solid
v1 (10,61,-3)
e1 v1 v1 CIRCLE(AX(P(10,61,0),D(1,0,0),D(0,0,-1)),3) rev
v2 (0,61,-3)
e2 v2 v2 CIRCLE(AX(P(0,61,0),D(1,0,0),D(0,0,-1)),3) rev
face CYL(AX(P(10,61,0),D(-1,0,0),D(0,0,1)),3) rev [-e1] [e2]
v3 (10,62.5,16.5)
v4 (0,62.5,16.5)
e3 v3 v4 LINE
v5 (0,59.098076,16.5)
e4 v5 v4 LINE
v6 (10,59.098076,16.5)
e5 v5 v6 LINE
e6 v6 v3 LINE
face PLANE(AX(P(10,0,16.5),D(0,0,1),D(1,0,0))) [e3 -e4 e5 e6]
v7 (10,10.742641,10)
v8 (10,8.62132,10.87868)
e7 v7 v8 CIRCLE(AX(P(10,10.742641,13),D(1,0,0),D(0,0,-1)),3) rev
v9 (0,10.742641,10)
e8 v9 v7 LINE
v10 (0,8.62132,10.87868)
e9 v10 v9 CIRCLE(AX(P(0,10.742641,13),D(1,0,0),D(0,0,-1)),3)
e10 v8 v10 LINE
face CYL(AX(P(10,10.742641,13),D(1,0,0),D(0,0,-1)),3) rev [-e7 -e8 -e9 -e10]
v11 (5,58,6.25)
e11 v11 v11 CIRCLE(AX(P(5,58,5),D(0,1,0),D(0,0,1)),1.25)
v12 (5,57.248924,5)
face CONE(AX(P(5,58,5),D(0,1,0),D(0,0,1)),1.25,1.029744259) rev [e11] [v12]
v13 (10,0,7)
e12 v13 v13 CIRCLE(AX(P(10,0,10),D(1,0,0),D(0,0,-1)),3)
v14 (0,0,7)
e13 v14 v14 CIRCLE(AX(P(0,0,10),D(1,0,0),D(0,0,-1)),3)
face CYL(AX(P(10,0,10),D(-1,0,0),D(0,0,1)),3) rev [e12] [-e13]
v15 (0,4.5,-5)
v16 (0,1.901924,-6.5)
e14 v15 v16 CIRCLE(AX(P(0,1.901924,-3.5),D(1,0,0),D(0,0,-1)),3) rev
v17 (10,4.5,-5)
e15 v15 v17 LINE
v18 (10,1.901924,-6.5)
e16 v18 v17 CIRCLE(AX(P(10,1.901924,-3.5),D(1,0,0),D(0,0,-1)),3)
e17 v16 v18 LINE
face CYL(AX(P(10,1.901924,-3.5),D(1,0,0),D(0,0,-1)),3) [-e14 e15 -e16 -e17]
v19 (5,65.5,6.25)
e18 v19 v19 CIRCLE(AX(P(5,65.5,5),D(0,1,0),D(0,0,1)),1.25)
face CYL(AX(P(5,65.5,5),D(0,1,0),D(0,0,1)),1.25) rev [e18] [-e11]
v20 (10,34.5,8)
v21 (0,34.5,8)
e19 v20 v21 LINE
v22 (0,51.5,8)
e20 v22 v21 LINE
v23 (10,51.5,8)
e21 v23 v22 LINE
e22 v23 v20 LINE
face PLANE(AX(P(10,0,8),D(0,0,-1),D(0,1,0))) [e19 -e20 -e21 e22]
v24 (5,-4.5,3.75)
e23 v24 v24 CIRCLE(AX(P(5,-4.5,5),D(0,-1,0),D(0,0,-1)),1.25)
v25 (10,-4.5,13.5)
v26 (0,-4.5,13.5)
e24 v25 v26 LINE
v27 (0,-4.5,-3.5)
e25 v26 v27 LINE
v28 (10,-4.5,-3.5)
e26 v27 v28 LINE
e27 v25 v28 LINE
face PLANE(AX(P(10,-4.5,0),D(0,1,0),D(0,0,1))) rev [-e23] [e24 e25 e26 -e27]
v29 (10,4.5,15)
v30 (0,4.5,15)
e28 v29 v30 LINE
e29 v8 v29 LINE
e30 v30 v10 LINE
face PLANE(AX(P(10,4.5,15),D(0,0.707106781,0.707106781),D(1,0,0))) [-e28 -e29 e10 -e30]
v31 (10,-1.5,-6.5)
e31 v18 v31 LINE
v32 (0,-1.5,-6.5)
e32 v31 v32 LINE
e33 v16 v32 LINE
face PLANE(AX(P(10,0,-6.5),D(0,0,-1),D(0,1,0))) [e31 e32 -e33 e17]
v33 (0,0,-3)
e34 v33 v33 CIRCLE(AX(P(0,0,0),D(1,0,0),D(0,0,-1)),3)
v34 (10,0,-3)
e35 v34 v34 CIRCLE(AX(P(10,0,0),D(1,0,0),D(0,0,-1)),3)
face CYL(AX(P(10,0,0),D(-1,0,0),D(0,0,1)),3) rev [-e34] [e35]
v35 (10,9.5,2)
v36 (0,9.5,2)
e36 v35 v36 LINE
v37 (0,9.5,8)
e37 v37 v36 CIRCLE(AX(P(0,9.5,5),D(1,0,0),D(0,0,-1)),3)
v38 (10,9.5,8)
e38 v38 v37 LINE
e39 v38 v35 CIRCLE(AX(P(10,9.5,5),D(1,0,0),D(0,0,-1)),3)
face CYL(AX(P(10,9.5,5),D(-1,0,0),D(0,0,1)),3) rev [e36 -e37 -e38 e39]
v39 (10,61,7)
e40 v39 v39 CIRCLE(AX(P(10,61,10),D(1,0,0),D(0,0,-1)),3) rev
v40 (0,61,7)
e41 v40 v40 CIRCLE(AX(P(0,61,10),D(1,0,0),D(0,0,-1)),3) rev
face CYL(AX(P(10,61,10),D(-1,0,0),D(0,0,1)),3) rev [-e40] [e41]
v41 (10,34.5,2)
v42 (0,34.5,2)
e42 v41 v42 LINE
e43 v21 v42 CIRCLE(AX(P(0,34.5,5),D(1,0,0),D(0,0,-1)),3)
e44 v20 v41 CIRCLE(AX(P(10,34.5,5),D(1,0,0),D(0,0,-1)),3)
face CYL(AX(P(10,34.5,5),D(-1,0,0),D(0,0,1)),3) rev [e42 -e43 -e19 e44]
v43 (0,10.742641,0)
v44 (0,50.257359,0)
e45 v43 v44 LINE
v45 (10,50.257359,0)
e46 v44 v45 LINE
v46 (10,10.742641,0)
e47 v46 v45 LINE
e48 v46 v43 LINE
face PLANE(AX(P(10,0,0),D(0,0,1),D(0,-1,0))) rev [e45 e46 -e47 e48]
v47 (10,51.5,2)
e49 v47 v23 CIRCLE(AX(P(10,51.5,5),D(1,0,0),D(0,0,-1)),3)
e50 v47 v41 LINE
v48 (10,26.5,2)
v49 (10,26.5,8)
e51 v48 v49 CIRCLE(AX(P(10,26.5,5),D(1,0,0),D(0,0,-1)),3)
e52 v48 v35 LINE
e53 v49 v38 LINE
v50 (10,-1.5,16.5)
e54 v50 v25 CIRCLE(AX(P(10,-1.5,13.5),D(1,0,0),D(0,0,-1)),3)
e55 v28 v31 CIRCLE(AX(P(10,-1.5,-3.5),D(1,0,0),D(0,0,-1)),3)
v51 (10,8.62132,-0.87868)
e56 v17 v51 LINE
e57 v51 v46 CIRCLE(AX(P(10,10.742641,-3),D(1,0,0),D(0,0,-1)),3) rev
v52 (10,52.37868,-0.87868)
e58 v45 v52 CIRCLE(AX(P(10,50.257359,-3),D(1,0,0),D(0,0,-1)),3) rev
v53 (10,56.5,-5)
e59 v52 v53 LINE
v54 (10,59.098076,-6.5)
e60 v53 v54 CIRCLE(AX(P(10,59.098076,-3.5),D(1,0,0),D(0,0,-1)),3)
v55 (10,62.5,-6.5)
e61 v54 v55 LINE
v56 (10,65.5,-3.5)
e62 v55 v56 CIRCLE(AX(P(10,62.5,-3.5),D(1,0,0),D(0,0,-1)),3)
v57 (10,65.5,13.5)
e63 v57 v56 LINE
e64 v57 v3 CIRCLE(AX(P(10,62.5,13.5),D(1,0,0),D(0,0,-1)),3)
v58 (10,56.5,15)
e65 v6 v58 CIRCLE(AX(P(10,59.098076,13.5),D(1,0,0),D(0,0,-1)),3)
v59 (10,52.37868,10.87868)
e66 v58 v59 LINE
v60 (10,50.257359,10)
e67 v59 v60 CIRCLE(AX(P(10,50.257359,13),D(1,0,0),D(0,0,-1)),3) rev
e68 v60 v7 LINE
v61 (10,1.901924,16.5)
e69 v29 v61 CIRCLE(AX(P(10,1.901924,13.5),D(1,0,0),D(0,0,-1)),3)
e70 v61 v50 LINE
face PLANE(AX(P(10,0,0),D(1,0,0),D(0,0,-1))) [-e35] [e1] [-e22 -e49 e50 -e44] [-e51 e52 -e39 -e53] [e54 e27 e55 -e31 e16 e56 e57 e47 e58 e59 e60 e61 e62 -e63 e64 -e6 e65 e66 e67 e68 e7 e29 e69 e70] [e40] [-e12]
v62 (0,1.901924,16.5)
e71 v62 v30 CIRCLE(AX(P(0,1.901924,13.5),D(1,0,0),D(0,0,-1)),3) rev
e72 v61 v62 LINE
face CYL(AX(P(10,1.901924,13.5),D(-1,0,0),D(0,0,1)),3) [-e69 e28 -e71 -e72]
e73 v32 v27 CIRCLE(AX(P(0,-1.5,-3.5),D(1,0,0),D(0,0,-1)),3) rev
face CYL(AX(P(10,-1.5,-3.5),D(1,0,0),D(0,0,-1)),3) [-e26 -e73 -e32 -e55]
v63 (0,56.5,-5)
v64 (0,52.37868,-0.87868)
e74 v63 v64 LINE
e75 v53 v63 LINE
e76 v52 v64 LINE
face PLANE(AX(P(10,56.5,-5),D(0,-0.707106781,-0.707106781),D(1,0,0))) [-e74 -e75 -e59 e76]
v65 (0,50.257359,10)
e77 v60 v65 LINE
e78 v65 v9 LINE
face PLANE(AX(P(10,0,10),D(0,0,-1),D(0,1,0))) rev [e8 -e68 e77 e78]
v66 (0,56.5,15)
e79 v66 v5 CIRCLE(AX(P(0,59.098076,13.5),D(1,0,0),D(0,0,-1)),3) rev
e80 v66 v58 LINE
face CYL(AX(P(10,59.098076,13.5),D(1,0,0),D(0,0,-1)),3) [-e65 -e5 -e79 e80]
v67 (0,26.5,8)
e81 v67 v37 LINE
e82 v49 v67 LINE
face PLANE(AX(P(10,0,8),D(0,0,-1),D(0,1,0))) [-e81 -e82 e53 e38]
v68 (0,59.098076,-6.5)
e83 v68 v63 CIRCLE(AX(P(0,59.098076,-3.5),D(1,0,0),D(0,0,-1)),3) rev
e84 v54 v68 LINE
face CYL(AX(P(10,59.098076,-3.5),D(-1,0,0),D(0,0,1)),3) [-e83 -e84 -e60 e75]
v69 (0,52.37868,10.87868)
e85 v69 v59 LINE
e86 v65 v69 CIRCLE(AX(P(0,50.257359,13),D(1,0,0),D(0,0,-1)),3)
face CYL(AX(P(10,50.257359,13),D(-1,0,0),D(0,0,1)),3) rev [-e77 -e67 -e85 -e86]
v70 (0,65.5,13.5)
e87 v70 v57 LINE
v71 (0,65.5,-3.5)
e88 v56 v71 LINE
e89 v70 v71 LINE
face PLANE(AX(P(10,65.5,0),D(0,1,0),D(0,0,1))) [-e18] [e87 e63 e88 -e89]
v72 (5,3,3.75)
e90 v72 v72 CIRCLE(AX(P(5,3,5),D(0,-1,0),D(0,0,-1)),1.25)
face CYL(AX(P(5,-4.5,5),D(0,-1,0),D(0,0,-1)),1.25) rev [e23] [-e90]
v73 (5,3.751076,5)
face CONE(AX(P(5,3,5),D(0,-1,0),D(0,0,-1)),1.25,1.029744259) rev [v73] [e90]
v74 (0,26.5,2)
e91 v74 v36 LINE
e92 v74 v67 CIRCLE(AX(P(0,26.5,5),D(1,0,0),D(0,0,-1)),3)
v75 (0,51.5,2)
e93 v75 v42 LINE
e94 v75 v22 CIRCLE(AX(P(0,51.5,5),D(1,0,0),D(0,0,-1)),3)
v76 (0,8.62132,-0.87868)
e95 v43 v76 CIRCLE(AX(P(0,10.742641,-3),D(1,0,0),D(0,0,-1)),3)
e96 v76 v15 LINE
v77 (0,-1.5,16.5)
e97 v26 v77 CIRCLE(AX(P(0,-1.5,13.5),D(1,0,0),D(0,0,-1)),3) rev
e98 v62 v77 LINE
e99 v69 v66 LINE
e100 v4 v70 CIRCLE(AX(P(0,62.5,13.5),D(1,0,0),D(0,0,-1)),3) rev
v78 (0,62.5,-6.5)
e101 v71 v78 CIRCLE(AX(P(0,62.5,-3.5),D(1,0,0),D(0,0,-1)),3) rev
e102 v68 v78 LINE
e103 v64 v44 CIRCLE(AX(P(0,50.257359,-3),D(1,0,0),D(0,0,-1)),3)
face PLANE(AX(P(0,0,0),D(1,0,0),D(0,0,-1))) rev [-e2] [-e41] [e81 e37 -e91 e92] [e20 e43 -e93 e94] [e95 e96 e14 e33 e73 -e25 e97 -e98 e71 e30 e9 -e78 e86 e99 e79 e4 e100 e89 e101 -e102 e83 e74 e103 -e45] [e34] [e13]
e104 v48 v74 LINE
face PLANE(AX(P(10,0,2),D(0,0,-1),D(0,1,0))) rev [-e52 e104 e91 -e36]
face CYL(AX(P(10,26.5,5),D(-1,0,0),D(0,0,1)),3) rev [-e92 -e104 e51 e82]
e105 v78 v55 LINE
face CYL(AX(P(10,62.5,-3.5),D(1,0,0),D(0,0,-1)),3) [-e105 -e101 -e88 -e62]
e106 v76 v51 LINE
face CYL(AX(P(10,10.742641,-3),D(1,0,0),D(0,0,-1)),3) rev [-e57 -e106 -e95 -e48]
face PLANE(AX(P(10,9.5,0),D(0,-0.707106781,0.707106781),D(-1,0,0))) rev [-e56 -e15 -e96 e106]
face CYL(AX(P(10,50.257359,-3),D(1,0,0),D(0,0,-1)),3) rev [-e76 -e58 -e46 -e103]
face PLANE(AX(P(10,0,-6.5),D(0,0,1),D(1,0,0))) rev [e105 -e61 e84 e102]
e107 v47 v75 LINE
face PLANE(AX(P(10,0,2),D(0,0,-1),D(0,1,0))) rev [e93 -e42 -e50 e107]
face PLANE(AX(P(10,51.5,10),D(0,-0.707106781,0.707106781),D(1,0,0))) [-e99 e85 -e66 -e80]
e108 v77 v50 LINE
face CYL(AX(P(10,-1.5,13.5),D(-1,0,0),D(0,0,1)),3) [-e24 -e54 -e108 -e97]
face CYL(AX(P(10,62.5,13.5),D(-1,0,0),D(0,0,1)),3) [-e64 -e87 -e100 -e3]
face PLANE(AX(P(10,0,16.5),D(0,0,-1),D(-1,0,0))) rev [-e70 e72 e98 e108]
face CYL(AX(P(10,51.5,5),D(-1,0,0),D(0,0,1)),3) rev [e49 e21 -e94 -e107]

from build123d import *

# Parameters (mm, degrees)
SKETCH1_R                       = 3
BOSS_EXTRUDE1_DEPTH             = 10
CHAMFER1_SIZE                   = 5
FILLET1_R                       = 3
M3_TAPPED_HOLE3_D               = 2.5
M3_TAPPED_HOLE3_DEPTH           = 7.5
M3_TAPPED_HOLE3_TIP             = 0.751075774
M3_TAPPED_HOLE3_ON_FACE_2_D     = 2.5
M3_TAPPED_HOLE3_ON_FACE_2_DEPTH = 7.5
M3_TAPPED_HOLE3_ON_FACE_2_TIP   = 0.751075774


with BuildPart() as part:
    # Sketch1 → Boss-Extrude1 (new body)
    with BuildSketch(Plane(origin=(0, 0, 0), x_dir=(0, 0, -1), z_dir=(1, 0, 0))):
        Polygon((-16.5, 65.5), (-16.5, 56.5), (-10, 56.5), (-10, 4.5), (-16.5, 4.5), (-16.5, -4.5), (6.5, -4.5), (6.5, 4.5), (0, 4.5), (0, 56.5), (6.5, 56.5), (6.5, 65.5), align=None)
        with Locations((-10, 0)):
            Circle(SKETCH1_R, mode=Mode.SUBTRACT)
        with BuildLine():
            ThreePointArc((-8, 26.5), (-5, 29.5), (-2, 26.5))
            Line((-2, 26.5), (-2, 9.5))
            ThreePointArc((-2, 9.5), (-5, 6.5), (-8, 9.5))
            Line((-8, 9.5), (-8, 26.5))
        make_face(mode=Mode.SUBTRACT)
        Circle(SKETCH1_R, mode=Mode.SUBTRACT)
        with BuildLine():
            Line((-2, 51.5), (-2, 34.5))
            ThreePointArc((-2, 34.5), (-5, 31.5), (-8, 34.5))
            Line((-8, 34.5), (-8, 51.5))
            ThreePointArc((-8, 51.5), (-5, 54.5), (-2, 51.5))
        make_face(mode=Mode.SUBTRACT)
        with Locations((-10, 61)):
            Circle(SKETCH1_R, mode=Mode.SUBTRACT)
        with Locations((0, 61)):
            Circle(SKETCH1_R, mode=Mode.SUBTRACT)
    extrude(amount=BOSS_EXTRUDE1_DEPTH)

    # Chamfer1
    chamfer1_edges = [part.edges().sort_by_distance(p)[0] for p in [
        (5, 4.5, 10),
        (5, 56.5, 10),
        (5, 56.5, 0),
        (5, 4.5, 0),
    ]]
    chamfer(chamfer1_edges, length=CHAMFER1_SIZE)

    # Fillet1
    # the kernel refuses this fillet: 3 mm, written as the material it adds along each edge
    with BuildSketch(Plane(origin=(0, 51.5, 0), x_dir=(0, 0.7071067811865468, -0.7071067811865482), z_dir=(1, 0, 0)), Plane(origin=(0, 9.5, 0), x_dir=(0, 1, 0), z_dir=(1, 0, 0))) as fillet1_piece_1:
        with BuildLine():
            CenterArc((FILLET1_R * 0.414213562373, -FILLET1_R), FILLET1_R, 90, 45)
            Line((-FILLET1_R * 0.292893218813, -FILLET1_R * 0.292893218813), (0, 0))
            Line((0, 0), (FILLET1_R * 0.414213562373, 0))
        make_face()
    extrude(amount=10)
    with BuildSketch(Plane(origin=(0, 9.5, 10), x_dir=(0, 1, 0), z_dir=(1, 0, 0)), Plane(origin=(0, 51.5, 10), x_dir=(0, 0.7071067811865468, 0.7071067811865482), z_dir=(1, 0, 0))) as fillet1_piece_2:
        with BuildLine():
            CenterArc((FILLET1_R * 0.414213562373, FILLET1_R), FILLET1_R, 225, 45)
            Line((-FILLET1_R * 0.292893218813, FILLET1_R * 0.292893218813), (0, 0))
            Line((0, 0), (FILLET1_R * 0.414213562373, 0))
        make_face()
    extrude(amount=10)
    # the kernel refuses this fillet: 3 mm, written as the material it takes off along each edge
    with BuildSketch(Plane(origin=(-6.495190528, 56.5, 16.5), x_dir=(0, 1, 0), z_dir=(1, 0, 0))) as fillet1_2_piece_1:
        with BuildLine():
            CenterArc((2.598076211, -3), FILLET1_R, 90, 60)
            Line((0, -1.5), (0, 0))
            Line((0, 0), (2.598076211, 0))
        make_face()
    extrude(amount=22.990381057, mode=Mode.SUBTRACT)
    with BuildSketch(Plane(origin=(-7.5, 65.5, 16.5), x_dir=(0, 0, -1), z_dir=(1, 0, 0)), Plane(origin=(-7.5, 65.5, -6.5), x_dir=(0, -1, 0), z_dir=(1, 0, 0))) as fillet1_2_piece_2:
        with BuildLine():
            CenterArc((FILLET1_R, -FILLET1_R), FILLET1_R, 90, 90)
            Line((0, -FILLET1_R), (0, 0))
            Line((0, 0), (FILLET1_R, 0))
        make_face()
    extrude(amount=25, mode=Mode.SUBTRACT)
    with BuildSketch(Plane(origin=(-6.495190528, 56.5, -6.5), x_dir=(0, 0, 1), z_dir=(1, 0, 0))) as fillet1_2_piece_3:
        with BuildLine():
            CenterArc((3, -2.598076211), FILLET1_R, 120, 60)
            Line((0, -2.598076211), (0, 0))
            Line((0, 0), (1.5, 0))
        make_face()
    extrude(amount=22.990381057, mode=Mode.SUBTRACT)
    with BuildSketch(Plane(origin=(-6.495190528, 4.5, -6.5), x_dir=(0, 0, 1), z_dir=(1, 0, 0))) as fillet1_2_piece_4:
        with BuildLine():
            CenterArc((3, 2.598076211), FILLET1_R, 180, 60)
            Line((0, 2.598076211), (0, 0))
            Line((0, 0), (1.5, 0))
        make_face()
    extrude(amount=22.990381057, mode=Mode.SUBTRACT)
    with BuildSketch(Plane(origin=(-7.5, -4.5, -6.5), x_dir=(0, 1, 0), z_dir=(1, 0, 0)), Plane(origin=(-7.5, -4.5, 16.5), x_dir=(0, 0, -1), z_dir=(1, 0, 0))) as fillet1_2_piece_5:
        with BuildLine():
            CenterArc((FILLET1_R, FILLET1_R), FILLET1_R, 180, 90)
            Line((0, FILLET1_R), (0, 0))
            Line((0, 0), (FILLET1_R, 0))
        make_face()
    extrude(amount=25, mode=Mode.SUBTRACT)
    with BuildSketch(Plane(origin=(-6.495190528, 4.5, 16.5), x_dir=(0, -1, 0), z_dir=(1, 0, 0))) as fillet1_2_piece_6:
        with BuildLine():
            CenterArc((2.598076211, 3), FILLET1_R, 210, 60)
            Line((0, 1.5), (0, 0))
            Line((0, 0), (2.598076211, 0))
        make_face()
    extrude(amount=22.990381057, mode=Mode.SUBTRACT)

    # M3 Tapped Hole3
    with Locations(Plane(origin=(5, 65.5, 5), x_dir=(0, 0, 1), z_dir=(0, 1, 0))):
        with Locations((0, 0)):
            Hole(M3_TAPPED_HOLE3_D / 2, depth=M3_TAPPED_HOLE3_DEPTH)
            with Locations((0, 0, -(M3_TAPPED_HOLE3_DEPTH + M3_TAPPED_HOLE3_TIP / 2))):  # 118° drill point
                Cone(0, M3_TAPPED_HOLE3_D / 2, M3_TAPPED_HOLE3_TIP, mode=Mode.SUBTRACT)

    # M3 Tapped Hole3 on face 2
    with Locations(Plane(origin=(5, -4.5, 5), x_dir=(0, 0, -1), z_dir=(0, -1, 0))):
        with Locations((0, 0)):
            Hole(M3_TAPPED_HOLE3_ON_FACE_2_D / 2, depth=M3_TAPPED_HOLE3_ON_FACE_2_DEPTH)
            with Locations((0, 0, -(M3_TAPPED_HOLE3_ON_FACE_2_DEPTH + M3_TAPPED_HOLE3_ON_FACE_2_TIP / 2))):  # 118° drill point
                Cone(0, M3_TAPPED_HOLE3_ON_FACE_2_D / 2, M3_TAPPED_HOLE3_ON_FACE_2_TIP, mode=Mode.SUBTRACT)


solid = part.part
